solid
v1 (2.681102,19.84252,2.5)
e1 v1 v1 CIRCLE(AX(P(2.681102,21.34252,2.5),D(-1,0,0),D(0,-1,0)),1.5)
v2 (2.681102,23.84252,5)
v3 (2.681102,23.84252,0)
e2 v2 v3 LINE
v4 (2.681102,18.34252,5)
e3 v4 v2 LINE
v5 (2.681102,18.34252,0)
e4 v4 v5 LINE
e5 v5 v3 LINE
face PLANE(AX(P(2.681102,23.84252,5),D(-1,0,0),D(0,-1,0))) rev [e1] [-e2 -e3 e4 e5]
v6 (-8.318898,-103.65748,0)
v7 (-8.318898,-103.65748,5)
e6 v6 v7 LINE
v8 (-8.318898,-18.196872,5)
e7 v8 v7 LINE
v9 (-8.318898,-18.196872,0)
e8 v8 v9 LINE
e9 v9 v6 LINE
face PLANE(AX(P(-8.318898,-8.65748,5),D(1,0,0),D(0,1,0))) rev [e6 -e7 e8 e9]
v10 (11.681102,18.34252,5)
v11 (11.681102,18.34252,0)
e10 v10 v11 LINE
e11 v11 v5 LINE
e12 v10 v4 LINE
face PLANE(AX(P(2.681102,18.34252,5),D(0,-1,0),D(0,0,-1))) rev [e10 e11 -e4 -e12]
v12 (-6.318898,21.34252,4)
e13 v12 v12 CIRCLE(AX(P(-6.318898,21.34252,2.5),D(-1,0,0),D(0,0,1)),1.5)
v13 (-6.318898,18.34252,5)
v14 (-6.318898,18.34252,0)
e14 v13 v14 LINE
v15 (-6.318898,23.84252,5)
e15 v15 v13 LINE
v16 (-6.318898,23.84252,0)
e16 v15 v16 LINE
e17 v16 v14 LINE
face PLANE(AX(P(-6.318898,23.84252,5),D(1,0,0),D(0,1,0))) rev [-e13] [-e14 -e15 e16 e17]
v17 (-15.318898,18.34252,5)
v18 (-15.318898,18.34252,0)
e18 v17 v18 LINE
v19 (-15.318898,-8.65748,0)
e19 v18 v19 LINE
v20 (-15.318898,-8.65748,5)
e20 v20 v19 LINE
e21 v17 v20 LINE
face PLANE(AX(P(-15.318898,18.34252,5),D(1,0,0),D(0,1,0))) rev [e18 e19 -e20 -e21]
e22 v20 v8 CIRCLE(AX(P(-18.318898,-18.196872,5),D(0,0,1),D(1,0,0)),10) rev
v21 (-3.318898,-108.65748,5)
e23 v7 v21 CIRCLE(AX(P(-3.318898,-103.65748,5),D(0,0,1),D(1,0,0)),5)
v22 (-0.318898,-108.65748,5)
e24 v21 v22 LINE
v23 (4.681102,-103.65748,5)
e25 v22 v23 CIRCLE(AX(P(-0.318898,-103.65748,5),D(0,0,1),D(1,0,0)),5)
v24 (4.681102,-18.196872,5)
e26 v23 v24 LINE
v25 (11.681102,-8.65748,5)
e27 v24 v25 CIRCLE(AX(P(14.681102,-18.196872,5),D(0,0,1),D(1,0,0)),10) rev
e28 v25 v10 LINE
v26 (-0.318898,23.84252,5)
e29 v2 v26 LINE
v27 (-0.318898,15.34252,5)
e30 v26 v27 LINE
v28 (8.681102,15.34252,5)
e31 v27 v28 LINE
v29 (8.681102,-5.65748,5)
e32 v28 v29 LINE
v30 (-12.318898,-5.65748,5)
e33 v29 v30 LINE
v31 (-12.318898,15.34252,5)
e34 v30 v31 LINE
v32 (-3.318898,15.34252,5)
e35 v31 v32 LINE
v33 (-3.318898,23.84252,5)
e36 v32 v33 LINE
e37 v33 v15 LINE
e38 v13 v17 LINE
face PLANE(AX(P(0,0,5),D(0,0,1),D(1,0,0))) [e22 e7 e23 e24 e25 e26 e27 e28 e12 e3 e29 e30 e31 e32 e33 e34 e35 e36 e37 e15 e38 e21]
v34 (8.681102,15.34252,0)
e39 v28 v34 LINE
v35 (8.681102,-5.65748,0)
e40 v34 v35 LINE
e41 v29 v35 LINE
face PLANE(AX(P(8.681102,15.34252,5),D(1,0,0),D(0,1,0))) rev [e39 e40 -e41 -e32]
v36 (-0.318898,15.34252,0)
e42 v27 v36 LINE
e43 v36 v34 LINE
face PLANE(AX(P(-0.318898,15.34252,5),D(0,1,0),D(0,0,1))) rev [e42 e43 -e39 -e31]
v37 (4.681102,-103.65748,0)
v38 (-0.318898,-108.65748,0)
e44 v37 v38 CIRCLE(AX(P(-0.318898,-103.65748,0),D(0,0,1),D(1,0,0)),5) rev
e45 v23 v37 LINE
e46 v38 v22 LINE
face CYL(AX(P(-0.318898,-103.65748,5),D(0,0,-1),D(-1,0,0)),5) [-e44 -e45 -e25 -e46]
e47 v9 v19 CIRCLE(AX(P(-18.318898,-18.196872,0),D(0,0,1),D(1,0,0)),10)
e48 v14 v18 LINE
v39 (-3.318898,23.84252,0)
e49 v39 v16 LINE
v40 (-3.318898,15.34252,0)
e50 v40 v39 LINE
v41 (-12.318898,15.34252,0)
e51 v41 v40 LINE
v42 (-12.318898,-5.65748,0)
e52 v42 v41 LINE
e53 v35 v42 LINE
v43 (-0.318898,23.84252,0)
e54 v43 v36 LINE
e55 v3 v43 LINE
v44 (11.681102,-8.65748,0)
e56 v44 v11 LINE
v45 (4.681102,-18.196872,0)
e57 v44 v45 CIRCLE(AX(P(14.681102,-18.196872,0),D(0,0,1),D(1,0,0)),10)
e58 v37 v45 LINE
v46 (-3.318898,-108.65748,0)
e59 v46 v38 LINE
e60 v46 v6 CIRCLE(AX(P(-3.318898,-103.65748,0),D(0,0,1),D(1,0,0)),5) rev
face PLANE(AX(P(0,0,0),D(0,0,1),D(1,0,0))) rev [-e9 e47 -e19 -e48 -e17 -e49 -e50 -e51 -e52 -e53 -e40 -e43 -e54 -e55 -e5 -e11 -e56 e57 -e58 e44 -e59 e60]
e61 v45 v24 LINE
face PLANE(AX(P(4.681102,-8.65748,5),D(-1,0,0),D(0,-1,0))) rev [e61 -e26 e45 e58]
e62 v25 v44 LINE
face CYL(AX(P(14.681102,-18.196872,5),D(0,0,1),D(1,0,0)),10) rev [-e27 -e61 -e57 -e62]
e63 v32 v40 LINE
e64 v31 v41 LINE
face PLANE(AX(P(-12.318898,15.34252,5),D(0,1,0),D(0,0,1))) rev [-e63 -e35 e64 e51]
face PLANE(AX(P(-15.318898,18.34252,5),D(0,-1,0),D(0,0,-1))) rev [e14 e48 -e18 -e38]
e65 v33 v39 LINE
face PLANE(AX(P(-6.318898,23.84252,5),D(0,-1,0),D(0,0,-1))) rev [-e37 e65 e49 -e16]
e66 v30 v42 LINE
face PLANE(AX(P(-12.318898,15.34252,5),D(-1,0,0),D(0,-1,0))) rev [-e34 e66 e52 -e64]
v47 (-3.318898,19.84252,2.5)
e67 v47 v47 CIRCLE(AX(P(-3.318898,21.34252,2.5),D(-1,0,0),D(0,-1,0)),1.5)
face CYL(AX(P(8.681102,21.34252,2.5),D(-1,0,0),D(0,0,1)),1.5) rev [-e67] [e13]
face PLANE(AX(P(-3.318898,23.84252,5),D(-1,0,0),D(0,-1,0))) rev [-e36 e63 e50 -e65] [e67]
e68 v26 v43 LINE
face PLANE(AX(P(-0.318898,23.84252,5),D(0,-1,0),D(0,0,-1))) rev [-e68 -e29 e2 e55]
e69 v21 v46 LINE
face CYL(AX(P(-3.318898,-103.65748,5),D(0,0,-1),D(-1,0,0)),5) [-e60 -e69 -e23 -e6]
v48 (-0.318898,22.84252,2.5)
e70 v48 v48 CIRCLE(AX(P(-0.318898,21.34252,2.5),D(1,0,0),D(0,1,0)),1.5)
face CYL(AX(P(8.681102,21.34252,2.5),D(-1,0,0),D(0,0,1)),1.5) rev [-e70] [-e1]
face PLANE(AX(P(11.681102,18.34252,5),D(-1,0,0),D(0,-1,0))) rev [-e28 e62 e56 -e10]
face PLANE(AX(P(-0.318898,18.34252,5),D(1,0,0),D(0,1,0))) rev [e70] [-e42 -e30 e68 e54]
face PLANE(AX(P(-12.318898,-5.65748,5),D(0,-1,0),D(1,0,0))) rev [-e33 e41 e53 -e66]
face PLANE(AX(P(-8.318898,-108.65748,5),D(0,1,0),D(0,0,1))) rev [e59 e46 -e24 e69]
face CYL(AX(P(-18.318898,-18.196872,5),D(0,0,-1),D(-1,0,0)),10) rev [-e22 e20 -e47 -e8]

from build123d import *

# Parameters (mm, degrees)
BOSS_EXTRUDE1_DEPTH = 5
FILLET1_R           = 10
FILLET2_R           = 5
SKETCH3_R           = 1.5
CUT_EXTRUDE1_DEPTH  = 15


with BuildPart() as part:
    # Sketch1 → Boss-Extrude1 (new body)
    with BuildSketch(Plane.XY):
        Polygon((4.681102362, -8.657480315), (11.681102362, -8.657480315), (11.681102362, 18.342519685), (2.681102362, 18.342519685), (2.681102362, 23.842519685), (-0.318897638, 23.842519685), (-0.318897638, 18.342519685), (-0.318897638, 15.342519685), (8.681102362, 15.342519685), (8.681102362, -5.657480315), (-12.318897638, -5.657480315), (-12.318897638, 15.342519685), (-3.318897638, 15.342519685), (-3.318897638, 18.342519685), (-3.318897638, 23.842519685), (-6.318897638, 23.842519685), (-6.318897638, 18.342519685), (-15.318897638, 18.342519685), (-15.318897638, -8.657480315), (-8.318897638, -8.657480315), (-8.318897638, -108.657480315), (4.681102362, -108.657480315), align=None)
    extrude(amount=BOSS_EXTRUDE1_DEPTH)

    # Fillet1
    # the kernel refuses this fillet: 10 mm, written as the material it adds along each edge
    with BuildSketch(Plane(origin=(-8.318897638, -8.657480315, 0), x_dir=(0, -1, 0), z_dir=(0, 0, 1))) as fillet1_piece_1:
        with BuildLine():
            CenterArc((9.539392014, -10), FILLET1_R, 90, 72.542396876)
            Line((0, -7), (-0.19078784, -6.94))
            ThreePointArc((-0.19078784, -6.94), (-0.2, -3.5), (-0.2, 0))
            Line((-0.2, 0), (0, 0.2))
            Line((0, 0.2), (9.539392014, 0.2))
            Line((9.539392014, 0.2), (9.539392014, 0))
        make_face()
    extrude(amount=5)
    with BuildSketch(Plane(origin=(4.681102362, -8.657480315, 0), x_dir=(1, 0, 0), z_dir=(0, 0, 1))) as fillet1_piece_2:
        with BuildLine():
            CenterArc((10, -9.539392014), FILLET1_R, 107.457603124, 72.542396876)
            Line((0, -9.539392014), (-0.2, -9.539392014))
            Line((-0.2, -9.539392014), (-0.2, 0))
            Line((-0.2, 0), (0, 0.2))
            ThreePointArc((0, 0.2), (3.5, 0.2), (6.94, 0.19078784))
            Line((6.94, 0.19078784), (7, 0))
        make_face()
    extrude(amount=5)

    # Fillet2
    fillet2_edges = [part.edges().sort_by_distance(p)[0] for p in [
        (4.681102362, -108.657480315, 2.5),
        (-8.318897638, -108.657480315, 2.5),
    ]]
    fillet(fillet2_edges, radius=FILLET2_R)

    # Sketch3 → Cut-Extrude1 (cut)
    with BuildSketch(Plane.ZY.offset(6.318897638)):
        with Locations(Location((2.5, 21.342519685, 0), (0, 0, 90))):
            Circle(SKETCH3_R)
    extrude(amount=-CUT_EXTRUDE1_DEPTH, mode=Mode.SUBTRACT)


solid = part.part
